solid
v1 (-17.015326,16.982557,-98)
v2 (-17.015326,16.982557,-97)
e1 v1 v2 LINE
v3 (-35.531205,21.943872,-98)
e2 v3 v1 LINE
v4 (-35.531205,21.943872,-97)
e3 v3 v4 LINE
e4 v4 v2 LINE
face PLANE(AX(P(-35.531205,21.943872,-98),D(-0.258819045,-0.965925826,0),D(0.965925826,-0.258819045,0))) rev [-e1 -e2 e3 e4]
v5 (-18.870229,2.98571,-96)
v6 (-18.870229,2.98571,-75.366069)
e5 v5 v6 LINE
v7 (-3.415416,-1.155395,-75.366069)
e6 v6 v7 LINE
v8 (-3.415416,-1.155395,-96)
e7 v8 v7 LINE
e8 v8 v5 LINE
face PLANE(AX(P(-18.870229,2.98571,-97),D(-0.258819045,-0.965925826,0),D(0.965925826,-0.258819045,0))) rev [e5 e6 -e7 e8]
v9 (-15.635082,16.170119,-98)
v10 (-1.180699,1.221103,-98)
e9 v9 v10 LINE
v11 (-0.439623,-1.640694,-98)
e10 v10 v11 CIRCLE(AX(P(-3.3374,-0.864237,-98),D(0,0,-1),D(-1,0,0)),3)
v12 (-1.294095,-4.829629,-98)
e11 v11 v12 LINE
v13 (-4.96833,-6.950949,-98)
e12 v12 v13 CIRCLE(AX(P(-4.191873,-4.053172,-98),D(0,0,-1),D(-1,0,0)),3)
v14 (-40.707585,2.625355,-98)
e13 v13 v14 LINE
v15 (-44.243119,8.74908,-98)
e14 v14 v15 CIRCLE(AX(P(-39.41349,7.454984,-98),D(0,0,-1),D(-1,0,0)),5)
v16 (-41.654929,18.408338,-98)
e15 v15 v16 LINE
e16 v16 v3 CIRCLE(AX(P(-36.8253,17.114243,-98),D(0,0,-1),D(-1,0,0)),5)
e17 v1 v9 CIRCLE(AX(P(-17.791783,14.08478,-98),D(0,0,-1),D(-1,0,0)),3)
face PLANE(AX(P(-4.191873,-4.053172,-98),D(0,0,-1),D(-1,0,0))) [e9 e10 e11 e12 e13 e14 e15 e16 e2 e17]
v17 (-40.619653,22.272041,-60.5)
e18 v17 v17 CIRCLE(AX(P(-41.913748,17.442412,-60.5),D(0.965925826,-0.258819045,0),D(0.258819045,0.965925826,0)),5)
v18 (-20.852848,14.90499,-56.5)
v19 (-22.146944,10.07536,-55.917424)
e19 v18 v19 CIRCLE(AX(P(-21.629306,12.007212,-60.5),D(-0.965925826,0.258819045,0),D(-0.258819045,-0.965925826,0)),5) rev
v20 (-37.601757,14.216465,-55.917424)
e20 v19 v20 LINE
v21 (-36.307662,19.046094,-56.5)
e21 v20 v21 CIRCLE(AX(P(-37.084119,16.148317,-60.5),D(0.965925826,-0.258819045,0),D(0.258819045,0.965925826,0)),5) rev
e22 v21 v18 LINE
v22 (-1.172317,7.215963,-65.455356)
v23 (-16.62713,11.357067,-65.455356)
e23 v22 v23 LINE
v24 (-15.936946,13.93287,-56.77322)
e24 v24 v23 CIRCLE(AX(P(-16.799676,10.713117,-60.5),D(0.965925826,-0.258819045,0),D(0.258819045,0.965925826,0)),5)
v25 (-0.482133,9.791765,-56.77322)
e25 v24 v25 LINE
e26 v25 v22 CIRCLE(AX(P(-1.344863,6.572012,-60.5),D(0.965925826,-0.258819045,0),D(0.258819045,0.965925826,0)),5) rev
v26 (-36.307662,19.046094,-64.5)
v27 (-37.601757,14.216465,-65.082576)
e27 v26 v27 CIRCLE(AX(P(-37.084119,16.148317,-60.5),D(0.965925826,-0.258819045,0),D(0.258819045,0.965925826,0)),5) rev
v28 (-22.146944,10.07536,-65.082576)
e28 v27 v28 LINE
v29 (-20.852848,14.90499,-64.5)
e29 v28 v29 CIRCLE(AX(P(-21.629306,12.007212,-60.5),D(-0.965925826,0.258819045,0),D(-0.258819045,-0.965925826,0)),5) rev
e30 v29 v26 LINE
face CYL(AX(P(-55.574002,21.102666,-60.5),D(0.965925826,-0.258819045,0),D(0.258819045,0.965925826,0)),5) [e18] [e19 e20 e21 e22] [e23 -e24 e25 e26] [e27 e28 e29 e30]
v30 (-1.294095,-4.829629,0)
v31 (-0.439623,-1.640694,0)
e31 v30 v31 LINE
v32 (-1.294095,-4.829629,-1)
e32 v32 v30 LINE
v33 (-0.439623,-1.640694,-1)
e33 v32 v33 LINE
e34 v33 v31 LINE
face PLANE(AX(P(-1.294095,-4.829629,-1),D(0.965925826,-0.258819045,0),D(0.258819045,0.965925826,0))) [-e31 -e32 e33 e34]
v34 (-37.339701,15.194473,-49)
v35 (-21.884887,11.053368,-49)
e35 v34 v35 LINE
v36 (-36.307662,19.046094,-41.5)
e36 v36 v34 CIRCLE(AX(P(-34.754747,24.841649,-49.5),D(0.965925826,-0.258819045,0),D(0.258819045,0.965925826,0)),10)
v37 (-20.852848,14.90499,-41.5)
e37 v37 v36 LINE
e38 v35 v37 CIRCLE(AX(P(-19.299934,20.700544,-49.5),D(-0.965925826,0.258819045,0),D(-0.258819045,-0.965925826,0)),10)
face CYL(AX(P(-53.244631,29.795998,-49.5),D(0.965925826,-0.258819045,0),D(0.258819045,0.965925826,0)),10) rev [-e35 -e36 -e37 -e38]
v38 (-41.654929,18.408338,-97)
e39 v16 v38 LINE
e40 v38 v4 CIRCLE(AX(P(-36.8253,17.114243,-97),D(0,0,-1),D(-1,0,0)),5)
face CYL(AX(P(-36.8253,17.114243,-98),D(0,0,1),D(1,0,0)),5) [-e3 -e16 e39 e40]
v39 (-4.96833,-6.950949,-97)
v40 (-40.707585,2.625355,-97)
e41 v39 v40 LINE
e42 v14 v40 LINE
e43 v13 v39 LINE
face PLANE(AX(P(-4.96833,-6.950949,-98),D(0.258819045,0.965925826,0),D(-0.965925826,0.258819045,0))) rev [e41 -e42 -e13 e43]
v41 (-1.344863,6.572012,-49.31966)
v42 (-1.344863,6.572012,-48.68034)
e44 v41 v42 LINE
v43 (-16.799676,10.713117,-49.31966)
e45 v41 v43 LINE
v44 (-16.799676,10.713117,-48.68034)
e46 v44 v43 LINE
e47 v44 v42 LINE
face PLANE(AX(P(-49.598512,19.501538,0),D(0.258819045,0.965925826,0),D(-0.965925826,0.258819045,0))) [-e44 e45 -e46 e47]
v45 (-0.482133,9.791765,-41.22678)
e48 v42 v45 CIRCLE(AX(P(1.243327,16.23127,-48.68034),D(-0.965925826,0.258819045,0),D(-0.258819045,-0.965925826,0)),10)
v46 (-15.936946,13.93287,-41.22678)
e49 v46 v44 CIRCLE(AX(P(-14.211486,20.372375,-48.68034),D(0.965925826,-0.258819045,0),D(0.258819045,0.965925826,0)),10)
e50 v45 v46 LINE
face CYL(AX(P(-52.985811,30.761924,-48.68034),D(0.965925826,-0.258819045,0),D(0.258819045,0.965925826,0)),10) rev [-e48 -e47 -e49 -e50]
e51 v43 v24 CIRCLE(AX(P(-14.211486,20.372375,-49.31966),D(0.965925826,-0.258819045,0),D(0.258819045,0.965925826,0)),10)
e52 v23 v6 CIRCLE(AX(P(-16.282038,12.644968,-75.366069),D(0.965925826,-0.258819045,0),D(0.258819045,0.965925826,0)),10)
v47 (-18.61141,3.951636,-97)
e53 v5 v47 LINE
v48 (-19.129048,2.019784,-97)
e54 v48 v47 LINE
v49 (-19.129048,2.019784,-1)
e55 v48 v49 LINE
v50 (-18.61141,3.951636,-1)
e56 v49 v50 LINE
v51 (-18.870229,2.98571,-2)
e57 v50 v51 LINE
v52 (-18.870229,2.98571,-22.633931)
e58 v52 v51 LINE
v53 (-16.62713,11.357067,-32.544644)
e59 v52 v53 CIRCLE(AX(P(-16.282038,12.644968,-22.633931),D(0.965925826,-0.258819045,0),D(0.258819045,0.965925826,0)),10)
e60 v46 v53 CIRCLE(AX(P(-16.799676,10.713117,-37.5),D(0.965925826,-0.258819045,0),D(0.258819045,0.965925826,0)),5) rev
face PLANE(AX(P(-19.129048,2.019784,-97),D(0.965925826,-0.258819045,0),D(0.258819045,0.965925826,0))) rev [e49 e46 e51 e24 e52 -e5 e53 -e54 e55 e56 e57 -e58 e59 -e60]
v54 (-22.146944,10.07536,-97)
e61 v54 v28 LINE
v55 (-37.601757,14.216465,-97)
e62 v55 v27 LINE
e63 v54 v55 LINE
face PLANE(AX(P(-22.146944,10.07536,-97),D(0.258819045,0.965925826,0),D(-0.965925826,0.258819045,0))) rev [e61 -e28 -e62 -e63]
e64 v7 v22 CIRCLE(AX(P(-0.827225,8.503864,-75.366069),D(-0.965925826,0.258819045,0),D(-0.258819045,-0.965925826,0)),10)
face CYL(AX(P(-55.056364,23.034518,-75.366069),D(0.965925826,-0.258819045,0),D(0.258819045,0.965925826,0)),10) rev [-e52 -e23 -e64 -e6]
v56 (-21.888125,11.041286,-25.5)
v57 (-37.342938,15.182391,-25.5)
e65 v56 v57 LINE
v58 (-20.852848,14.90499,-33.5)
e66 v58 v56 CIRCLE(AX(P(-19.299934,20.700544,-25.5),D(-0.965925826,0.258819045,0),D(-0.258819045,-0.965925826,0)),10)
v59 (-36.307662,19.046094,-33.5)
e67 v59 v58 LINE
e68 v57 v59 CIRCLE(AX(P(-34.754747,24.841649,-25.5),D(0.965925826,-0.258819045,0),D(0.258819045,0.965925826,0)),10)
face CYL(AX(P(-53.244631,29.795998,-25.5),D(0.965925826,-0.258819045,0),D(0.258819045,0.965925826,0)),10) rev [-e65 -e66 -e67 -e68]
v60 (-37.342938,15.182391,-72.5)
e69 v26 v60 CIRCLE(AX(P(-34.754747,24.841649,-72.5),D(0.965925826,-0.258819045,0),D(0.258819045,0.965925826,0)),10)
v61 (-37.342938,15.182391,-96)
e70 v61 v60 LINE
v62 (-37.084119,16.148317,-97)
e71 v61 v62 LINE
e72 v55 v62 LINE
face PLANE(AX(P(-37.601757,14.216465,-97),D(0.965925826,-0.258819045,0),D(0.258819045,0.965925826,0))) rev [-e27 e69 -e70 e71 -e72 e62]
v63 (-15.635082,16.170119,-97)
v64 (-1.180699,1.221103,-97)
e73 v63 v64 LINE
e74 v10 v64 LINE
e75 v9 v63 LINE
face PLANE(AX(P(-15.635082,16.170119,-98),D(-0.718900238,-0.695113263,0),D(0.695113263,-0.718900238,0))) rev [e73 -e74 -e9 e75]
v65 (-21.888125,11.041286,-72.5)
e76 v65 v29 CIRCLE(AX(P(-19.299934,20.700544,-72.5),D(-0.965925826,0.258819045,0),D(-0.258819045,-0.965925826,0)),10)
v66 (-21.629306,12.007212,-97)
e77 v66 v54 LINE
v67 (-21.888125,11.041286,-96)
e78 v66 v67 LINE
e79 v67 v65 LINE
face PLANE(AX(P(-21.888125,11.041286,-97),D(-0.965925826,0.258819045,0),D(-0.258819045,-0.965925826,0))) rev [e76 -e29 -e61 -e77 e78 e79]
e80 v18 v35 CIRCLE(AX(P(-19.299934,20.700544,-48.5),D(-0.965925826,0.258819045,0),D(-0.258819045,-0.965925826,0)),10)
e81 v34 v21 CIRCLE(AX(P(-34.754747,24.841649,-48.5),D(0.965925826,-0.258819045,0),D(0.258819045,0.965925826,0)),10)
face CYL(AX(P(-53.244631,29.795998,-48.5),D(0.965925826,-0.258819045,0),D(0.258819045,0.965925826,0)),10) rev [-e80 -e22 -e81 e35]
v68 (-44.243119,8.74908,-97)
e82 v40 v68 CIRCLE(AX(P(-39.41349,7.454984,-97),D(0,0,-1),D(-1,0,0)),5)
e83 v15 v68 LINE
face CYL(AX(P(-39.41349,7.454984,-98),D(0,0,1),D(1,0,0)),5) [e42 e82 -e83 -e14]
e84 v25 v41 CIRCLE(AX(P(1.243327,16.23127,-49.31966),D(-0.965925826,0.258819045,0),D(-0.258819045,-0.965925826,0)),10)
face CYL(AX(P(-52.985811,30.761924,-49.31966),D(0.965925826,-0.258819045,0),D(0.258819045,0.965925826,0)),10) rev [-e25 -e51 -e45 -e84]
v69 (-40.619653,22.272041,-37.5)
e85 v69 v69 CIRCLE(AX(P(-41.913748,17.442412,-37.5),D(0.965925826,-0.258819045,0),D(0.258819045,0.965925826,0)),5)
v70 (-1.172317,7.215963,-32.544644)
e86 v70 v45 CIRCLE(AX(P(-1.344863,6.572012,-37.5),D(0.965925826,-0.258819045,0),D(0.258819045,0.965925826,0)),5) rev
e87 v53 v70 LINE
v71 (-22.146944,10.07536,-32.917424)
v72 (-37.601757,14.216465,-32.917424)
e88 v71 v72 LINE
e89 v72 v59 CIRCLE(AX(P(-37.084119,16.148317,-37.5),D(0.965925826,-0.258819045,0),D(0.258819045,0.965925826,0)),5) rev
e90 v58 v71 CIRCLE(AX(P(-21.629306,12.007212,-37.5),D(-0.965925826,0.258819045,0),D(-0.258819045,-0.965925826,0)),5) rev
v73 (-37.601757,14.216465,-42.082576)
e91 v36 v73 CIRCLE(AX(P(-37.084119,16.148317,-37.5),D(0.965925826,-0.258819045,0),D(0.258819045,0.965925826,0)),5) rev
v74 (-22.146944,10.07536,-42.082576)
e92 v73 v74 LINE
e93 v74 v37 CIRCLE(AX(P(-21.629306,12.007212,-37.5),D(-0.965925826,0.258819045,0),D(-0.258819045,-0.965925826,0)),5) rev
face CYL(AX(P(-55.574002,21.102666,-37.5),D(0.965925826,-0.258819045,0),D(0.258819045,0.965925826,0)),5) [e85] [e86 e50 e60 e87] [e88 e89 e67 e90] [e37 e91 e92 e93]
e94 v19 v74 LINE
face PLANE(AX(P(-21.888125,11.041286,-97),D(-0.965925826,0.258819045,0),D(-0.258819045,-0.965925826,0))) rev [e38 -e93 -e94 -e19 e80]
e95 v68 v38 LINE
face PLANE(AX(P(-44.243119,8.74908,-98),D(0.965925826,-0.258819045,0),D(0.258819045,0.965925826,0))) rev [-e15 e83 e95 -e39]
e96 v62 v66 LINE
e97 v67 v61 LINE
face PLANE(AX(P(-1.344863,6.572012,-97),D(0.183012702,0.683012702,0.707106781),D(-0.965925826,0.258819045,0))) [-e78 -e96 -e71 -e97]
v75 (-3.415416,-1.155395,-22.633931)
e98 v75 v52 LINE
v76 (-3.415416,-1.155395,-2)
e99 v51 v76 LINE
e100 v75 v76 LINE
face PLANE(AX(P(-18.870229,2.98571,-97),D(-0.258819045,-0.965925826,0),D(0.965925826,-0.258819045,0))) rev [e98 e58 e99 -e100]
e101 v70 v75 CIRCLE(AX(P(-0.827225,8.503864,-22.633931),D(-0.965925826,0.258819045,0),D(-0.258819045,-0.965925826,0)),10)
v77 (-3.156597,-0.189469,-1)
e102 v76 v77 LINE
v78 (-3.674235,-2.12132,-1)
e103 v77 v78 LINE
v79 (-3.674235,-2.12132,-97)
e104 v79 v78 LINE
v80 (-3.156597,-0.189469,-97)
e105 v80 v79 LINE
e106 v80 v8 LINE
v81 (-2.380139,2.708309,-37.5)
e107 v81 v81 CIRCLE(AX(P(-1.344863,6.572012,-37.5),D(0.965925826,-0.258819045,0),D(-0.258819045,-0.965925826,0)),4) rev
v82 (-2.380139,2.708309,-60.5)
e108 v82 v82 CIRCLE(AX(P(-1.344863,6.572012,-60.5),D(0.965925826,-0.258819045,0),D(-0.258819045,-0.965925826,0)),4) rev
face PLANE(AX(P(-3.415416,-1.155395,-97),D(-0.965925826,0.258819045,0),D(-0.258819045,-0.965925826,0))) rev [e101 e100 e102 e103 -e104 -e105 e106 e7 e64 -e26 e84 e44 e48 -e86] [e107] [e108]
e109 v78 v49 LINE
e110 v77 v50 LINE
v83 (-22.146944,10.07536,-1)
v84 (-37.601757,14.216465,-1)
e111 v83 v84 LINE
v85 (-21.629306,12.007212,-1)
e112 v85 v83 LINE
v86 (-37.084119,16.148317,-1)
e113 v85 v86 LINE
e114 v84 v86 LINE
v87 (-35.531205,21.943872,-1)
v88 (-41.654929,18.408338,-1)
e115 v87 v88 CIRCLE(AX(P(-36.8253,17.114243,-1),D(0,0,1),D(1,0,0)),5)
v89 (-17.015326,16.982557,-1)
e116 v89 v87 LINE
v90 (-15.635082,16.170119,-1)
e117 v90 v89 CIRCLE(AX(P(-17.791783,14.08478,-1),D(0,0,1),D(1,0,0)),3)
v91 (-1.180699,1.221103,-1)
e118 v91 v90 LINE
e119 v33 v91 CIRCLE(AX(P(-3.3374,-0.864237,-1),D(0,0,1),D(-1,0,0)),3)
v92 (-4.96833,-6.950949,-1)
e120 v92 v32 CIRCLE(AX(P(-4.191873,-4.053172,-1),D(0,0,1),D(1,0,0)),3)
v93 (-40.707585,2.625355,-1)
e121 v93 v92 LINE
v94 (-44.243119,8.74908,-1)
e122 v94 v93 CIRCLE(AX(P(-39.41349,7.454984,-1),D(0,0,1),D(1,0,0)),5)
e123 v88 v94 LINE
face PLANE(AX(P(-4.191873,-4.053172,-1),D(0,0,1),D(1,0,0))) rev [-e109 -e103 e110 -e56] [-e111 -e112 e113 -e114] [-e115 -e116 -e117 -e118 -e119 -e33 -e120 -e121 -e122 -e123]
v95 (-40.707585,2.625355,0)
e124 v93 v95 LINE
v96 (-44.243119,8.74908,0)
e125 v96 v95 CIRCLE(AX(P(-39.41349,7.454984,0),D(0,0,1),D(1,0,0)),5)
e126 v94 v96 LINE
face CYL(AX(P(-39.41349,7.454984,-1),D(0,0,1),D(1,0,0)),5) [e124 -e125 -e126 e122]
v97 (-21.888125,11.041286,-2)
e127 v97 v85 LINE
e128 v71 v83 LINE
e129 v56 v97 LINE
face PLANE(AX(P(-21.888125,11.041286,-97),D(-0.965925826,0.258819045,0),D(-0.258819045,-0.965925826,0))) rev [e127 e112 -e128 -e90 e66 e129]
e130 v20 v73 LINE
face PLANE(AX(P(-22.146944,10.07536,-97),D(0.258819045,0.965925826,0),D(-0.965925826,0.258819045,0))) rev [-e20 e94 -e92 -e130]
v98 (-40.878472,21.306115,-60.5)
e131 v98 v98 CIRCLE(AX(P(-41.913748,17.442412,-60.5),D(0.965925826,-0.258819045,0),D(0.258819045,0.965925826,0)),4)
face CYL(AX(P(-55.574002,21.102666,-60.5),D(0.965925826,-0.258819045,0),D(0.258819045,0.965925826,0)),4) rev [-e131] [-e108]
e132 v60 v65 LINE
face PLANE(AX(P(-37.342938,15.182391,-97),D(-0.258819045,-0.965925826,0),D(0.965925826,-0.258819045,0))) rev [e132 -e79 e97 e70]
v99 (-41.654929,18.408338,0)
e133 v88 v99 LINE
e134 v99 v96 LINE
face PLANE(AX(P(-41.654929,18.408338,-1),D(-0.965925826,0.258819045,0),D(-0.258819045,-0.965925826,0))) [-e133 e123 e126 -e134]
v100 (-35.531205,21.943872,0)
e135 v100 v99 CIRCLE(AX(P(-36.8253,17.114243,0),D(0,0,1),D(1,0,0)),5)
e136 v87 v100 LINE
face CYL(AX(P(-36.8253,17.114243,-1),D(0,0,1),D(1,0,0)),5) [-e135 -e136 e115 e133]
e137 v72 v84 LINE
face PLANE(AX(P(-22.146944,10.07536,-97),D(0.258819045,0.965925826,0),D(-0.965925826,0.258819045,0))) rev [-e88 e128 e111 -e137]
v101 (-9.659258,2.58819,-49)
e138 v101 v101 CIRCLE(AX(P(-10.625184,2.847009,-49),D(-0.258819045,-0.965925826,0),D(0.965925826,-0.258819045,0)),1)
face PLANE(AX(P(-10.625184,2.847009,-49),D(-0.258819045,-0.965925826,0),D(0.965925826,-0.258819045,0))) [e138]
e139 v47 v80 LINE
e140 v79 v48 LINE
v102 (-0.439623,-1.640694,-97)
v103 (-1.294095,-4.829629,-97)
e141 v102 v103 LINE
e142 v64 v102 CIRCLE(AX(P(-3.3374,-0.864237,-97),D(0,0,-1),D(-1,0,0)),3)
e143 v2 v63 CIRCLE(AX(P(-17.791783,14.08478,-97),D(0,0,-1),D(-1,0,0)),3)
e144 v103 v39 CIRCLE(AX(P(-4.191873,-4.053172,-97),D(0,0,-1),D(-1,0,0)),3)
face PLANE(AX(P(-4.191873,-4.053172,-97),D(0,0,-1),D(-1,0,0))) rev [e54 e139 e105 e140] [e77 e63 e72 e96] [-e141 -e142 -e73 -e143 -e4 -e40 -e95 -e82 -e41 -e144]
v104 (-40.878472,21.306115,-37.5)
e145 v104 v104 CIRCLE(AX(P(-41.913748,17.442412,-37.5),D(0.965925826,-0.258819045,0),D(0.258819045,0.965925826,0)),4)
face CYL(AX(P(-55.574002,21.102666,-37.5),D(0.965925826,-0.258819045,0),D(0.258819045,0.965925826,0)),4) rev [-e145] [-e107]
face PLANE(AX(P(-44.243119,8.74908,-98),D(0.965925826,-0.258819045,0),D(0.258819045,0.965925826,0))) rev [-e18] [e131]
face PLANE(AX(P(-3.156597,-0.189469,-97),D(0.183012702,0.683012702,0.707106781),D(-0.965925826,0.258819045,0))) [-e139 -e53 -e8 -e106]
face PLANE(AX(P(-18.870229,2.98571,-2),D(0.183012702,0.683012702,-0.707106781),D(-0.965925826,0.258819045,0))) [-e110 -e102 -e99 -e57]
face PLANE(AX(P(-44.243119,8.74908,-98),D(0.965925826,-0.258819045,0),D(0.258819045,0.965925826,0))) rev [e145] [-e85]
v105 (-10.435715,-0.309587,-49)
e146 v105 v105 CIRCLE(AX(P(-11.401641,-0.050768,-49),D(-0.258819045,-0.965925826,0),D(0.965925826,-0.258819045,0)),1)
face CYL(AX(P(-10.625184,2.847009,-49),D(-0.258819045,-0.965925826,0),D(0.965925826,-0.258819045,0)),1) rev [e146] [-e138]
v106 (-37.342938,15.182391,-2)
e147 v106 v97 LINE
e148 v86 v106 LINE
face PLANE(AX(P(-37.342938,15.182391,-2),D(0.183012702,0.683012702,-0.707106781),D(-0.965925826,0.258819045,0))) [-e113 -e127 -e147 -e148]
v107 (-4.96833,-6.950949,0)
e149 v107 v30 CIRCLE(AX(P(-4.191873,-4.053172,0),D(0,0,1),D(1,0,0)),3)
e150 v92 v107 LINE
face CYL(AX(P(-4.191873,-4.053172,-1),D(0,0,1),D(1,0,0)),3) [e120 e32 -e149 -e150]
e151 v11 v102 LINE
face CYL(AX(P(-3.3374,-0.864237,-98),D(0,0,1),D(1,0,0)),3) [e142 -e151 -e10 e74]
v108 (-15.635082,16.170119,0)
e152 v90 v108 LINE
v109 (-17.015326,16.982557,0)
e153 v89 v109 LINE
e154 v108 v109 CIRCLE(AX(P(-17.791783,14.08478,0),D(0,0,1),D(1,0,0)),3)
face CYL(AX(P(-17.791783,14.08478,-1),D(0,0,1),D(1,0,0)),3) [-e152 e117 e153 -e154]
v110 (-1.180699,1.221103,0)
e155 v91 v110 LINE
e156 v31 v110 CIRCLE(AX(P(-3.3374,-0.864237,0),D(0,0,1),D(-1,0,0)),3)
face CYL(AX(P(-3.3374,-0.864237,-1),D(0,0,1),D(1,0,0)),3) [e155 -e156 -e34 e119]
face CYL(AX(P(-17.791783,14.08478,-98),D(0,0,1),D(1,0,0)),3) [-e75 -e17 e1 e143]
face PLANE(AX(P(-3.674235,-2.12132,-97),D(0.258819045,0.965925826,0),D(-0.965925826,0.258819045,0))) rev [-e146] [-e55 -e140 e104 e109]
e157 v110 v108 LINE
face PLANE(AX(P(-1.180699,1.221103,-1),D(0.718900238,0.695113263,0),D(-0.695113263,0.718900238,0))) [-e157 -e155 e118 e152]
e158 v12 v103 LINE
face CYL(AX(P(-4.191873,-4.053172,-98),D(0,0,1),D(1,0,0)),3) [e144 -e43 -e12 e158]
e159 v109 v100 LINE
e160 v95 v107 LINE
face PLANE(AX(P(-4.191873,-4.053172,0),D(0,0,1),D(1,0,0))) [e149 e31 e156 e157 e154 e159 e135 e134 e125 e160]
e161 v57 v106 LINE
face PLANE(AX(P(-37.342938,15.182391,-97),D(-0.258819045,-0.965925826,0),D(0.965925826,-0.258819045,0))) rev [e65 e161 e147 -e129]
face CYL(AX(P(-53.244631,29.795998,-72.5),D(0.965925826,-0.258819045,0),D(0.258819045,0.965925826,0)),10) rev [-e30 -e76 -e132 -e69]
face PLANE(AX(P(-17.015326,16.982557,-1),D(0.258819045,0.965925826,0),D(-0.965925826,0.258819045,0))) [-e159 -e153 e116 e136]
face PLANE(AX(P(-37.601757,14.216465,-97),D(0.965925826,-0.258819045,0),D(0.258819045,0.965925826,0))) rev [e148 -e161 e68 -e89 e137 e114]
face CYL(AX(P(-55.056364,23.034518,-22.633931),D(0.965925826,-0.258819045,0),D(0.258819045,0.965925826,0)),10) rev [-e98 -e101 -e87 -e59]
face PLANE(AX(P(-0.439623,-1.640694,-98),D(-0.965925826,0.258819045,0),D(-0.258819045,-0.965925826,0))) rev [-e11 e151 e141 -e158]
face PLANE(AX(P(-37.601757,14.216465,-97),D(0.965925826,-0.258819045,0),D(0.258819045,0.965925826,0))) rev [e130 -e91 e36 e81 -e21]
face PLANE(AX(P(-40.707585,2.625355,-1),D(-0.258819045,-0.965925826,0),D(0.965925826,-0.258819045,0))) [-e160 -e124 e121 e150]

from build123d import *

# Parameters (mm, degrees)
BOSS_EXTRUDE1_DEPTH = 1
BOSS_EXTRUDE2_DEPTH = 96
BOSS_EXTRUDE3_DEPTH = 1
BOSS_EXTRUDE4_DEPTH = 16
EXTRUDE_THIN1_REACH = 110.549
CUT_EXTRUDE1_DEPTH  = 102.965680501
CUT_EXTRUDE2_DEPTH  = 102.965680501
FILLET1_START       = -19
FILLET1_DEPTH       = 16
FILLET2_R           = 10
FILLET3_R           = 10
FILLET4_R           = 10
CHAMFER1_SIZE       = 1
CHAMFER2_SIZE       = 1
SKETCH8_R           = 1
CUT_EXTRUDE3_DEPTH  = 3


with BuildPart() as part:
    # Sketch1 → Boss-Extrude1 (new body)
    with BuildSketch(Plane.XY):
        with BuildLine():
            Line((-1.180699325, 1.221103194), (-15.635082302, 16.170119303))
            ThreePointArc((-15.635082302, 16.170119303), (-16.269985561, 16.670148445), (-17.01532588, 16.982556993))
            Line((-17.01532588, 16.982556993), (-35.53120451, 21.94387172))
            ThreePointArc((-35.53120451, 21.94387172), (-39.325299736, 21.444369607), (-41.654928867, 18.408337814))
            Line((-41.654928867, 18.408337814), (-44.243119318, 8.749079551))
            ThreePointArc((-44.243119318, 8.749079551), (-43.743617206, 4.954984325), (-40.707585412, 2.625355194))
            Line((-40.707585412, 2.625355194), (-4.96832984, -6.950949475))
            ThreePointArc((-4.96832984, -6.950949475), (-2.691872704, -6.651248207), (-1.294095226, -4.829629131))
            Line((-1.294095226, -4.829629131), (-0.43962256, -1.640693729))
            ThreePointArc((-0.43962256, -1.640693729), (-0.433194836, -0.11217799), (-1.180699325, 1.221103194))
        make_face()
    extrude(amount=-BOSS_EXTRUDE1_DEPTH)

    # Sketch2 → Boss-Extrude2 (add)
    with BuildSketch(Plane(origin=(0, 0, -1), x_dir=(-1, 0, 0), z_dir=(0, 0, -1))):
        Polygon((3.415415569, -1.155394517), (3.674234614, -2.121320344), (19.129047835, 2.019784378), (18.87022879, 2.985710204), align=None)
        Polygon((21.888124605, 11.041286214), (22.146943651, 10.075360388), (37.601756871, 14.216465109), (37.342937826, 15.182390936), align=None)
    extrude(amount=BOSS_EXTRUDE2_DEPTH)

    # Sketch3 → Boss-Extrude3 (add)
    with BuildSketch(Plane(origin=(0, 0, -97), x_dir=(-1, 0, 0), z_dir=(0, 0, -1))):
        with BuildLine():
            Line((4.96832984, -6.950949475), (40.707585412, 2.625355194))
            ThreePointArc((40.707585412, 2.625355194), (43.743617206, 4.954984325), (44.243119318, 8.749079551))
            Line((44.243119318, 8.749079551), (41.654928867, 18.408337814))
            ThreePointArc((41.654928867, 18.408337814), (39.325299736, 21.444369607), (35.53120451, 21.94387172))
            Line((35.53120451, 21.94387172), (17.01532588, 16.982556993))
            ThreePointArc((17.01532588, 16.982556993), (16.269985561, 16.670148445), (15.635082302, 16.170119303))
            Line((15.635082302, 16.170119303), (1.180699325, 1.221103194))
            ThreePointArc((1.180699325, 1.221103194), (0.433194836, -0.11217799), (0.43962256, -1.640693729))
            Line((0.43962256, -1.640693729), (1.294095226, -4.829629131))
            ThreePointArc((1.294095226, -4.829629131), (2.691872704, -6.651248207), (4.96832984, -6.950949475))
        make_face()
    extrude(amount=BOSS_EXTRUDE3_DEPTH)

    # Sketch4 → Boss-Extrude4 (add)
    with BuildSketch(Plane(origin=(-2.897777479, 0.776457135, 0), x_dir=(0, 0, -1), z_dir=(0.9659258262890703, -0.25881904510251386, 0))):
        with BuildLine():
            Line((49, 6), (49, -2))
            Line((49, -2), (65.5, -2))
            Line((65.5, -2), (65.5, 6))
            ThreePointArc((65.5, 6), (60.5, 1), (55.5, 6))
            Line((55.5, 6), (49, 6))
        make_face()
        with BuildLine():
            Line((32.5, 6), (32.5, -2))
            Line((32.5, -2), (49, -2))
            Line((49, -2), (49, 6))
            Line((49, 6), (42.5, 6))
            ThreePointArc((42.5, 6), (37.5, 1), (32.5, 6))
        make_face()
    extrude(amount=-BOSS_EXTRUDE4_DEPTH)

    # Extrude-Thin1: up to this face of the body (flat: up to its plane)
    extrude_thin1_end = Plane(part.part.faces().sort_by_distance((-42.949024093, 13.578708682, -97.5))[0])
    # Sketch5 → Extrude-Thin1 (add, up to the picked face)
    with BuildSketch(Plane(origin=(-2.897777479, 0.776457135, 0), x_dir=(0, 0, -1), z_dir=(0.9659258262890703, -0.25881904510251386, 0)), mode=Mode.PRIVATE) as extrude_thin1_sk1:
        with BuildLine():
            ThreePointArc((55.5, 6), (60.5, 1), (65.5, 6))
            ThreePointArc((65.5, 6), (60.5, 11), (55.5, 6))
        make_face()
        with BuildLine():
            ThreePointArc((56.5, 6), (60.5, 2), (64.5, 6))
            ThreePointArc((64.5, 6), (60.5, 10), (56.5, 6))
        make_face(mode=Mode.SUBTRACT)
    extrude_thin1_tool1 = split(extrude(extrude_thin1_sk1.sketch, amount=-EXTRUDE_THIN1_REACH, mode=Mode.PRIVATE), bisect_by=extrude_thin1_end, keep=Keep.BOTH, mode=Mode.PRIVATE)
    # Sketch5 → Extrude-Thin1 (add, up to the picked face)
    with BuildSketch(Plane(origin=(-2.897777479, 0.776457135, 0), x_dir=(0, 0, -1), z_dir=(0.9659258262890703, -0.25881904510251386, 0)), mode=Mode.PRIVATE) as extrude_thin1_sk2:
        with BuildLine():
            ThreePointArc((32.5, 6), (37.5, 1), (42.5, 6))
            ThreePointArc((42.5, 6), (37.5, 11), (32.5, 6))
        make_face()
        with BuildLine():
            ThreePointArc((33.5, 6), (37.5, 2), (41.5, 6))
            ThreePointArc((41.5, 6), (37.5, 10), (33.5, 6))
        make_face(mode=Mode.SUBTRACT)
    extrude_thin1_tool2 = split(extrude(extrude_thin1_sk2.sketch, amount=-EXTRUDE_THIN1_REACH, mode=Mode.PRIVATE), bisect_by=extrude_thin1_end, keep=Keep.BOTH, mode=Mode.PRIVATE)
    add(extrude_thin1_tool1.solids().sort_by(Axis((-2.602356, 1.878986, -60.5), (-0.9659258262890703, 0.25881904510251386, 0)))[0])
    add(extrude_thin1_tool2.solids().sort_by(Axis((-2.602356, 1.878986, -37.5), (-0.9659258262890703, 0.25881904510251386, 0)))[0])

    # Sketch6 → Cut-Extrude1 (cut, through all)
    with BuildSketch(Plane(origin=(-23.182219831, 6.211657082, 0), x_dir=(0, 0, -1), z_dir=(0.9659258262890705, -0.2588190451025127, 0))):
        with BuildLine():
            Line((57.035898385, 4), (63.964101615, 4))
            ThreePointArc((63.964101615, 4), (64.202459174, 4.486132084), (64.372983346, 5))
            Line((64.372983346, 5), (56.627016654, 5))
            ThreePointArc((56.627016654, 5), (56.797540826, 4.486132084), (57.035898385, 4))
        make_face()
    extrude(amount=-CUT_EXTRUDE1_DEPTH, mode=Mode.SUBTRACT)

    # Sketch7 → Cut-Extrude2 (cut, through all)
    with BuildSketch(Plane(origin=(-23.182219831, 6.211657082, 0), x_dir=(0, 0, -1), z_dir=(0.9659258262890704, -0.25881904510251263, 0))):
        with BuildLine():
            Line((34.035898385, 4), (40.964101615, 4))
            ThreePointArc((40.964101615, 4), (41.202459174, 4.486132084), (41.372983346, 5))
            Line((41.372983346, 5), (33.627016654, 5))
            ThreePointArc((33.627016654, 5), (33.797540826, 4.486132084), (34.035898385, 4))
        make_face()
    extrude(amount=-CUT_EXTRUDE2_DEPTH, mode=Mode.SUBTRACT)

    # Fillet1: read off the stored shape, not the designer's step
    # Fillet1 outline → Fillet1 (add)
    with BuildSketch(Plane(origin=(0, 0, 0), x_dir=(0.2588190451025141, 0.96592582628907, 0), z_dir=(0.9659258262890701, -0.2588190451025141, 0)).offset(FILLET1_START)):
        with BuildLine():
            ThreePointArc((6.666666667, -32.544643751), (0.472273473, -29.216737139), (-2, -22.633931253))
            Line((-2, -22.633931253), (-2, -32.5))
            Line((-2, -32.5), (6, -32.5))
            ThreePointArc((6, -32.5), (6.334079897, -32.511173422), (6.666666667, -32.544643751))
        make_face()
        with BuildLine():
            ThreePointArc((-2, -75.366068747), (0.472273473, -68.783262861), (6.666666667, -65.455356249))
            ThreePointArc((6.666666667, -65.455356249), (6.334079897, -65.488826578), (6, -65.5))
            Line((6, -65.5), (-2, -65.5))
            Line((-2, -65.5), (-2, -75.366068747))
        make_face()
    extrude(amount=FILLET1_DEPTH)

    # Fillet2
    # the kernel refuses this fillet: 10 mm, written as the material it adds along each edge
    with BuildSketch(Plane(origin=(-37.342937826, 15.182390936, -65.398979486), x_dir=(0, 0, -1), z_dir=(0.9659258262890703, -0.25881904510251386, 0))) as fillet2_piece_1:
        with BuildLine():
            CenterArc((7.101020514, 10), FILLET2_R, 216.869897646, 53.130102354)
            ThreePointArc((-0.898979486, 4), (-0.020664308, 2.096376317), (0, 0))
            Line((0, 0), (7.101020514, 0))
        make_face()
    extrude(amount=16)
    with BuildSketch(Plane(origin=(-37.342937826, 15.182390936, -32.601020514), x_dir=(0.25252017519049164, 0.9424181237471358, -0.21927526343546186), z_dir=(0.9659258262890703, -0.25881904510251386, 0))) as fillet2_piece_2:
        with BuildLine():
            CenterArc((8.199552211, 9.120955865), FILLET2_R, 192.666469307, 53.130102354)
            Line((-1.557078144, 6.92820323), (0, 0))
            ThreePointArc((0, 0), (2.049888053, 0.439522068), (4.099776106, 0))
        make_face()
    extrude(amount=16)

    # Fillet3
    # the kernel refuses this fillet: 10 mm, written as the material it adds along each edge
    with BuildSketch(Plane(origin=(-37.342937826, 15.182390936, -55.601020514), x_dir=(0.252520175190492, 0.9424181237471373, -0.21927526343545575), z_dir=(0.9659258262890703, -0.25881904510251386, 0))) as fillet3_piece_1:
        with BuildLine():
            CenterArc((8.199552211, 9.120955865), FILLET3_R, 192.666469307, 53.130102354)
            Line((-1.557078144, 6.92820323), (0, 0))
            ThreePointArc((0, 0), (2.049888053, 0.439522068), (4.099776106, 0))
        make_face()
    extrude(amount=16)
    with BuildSketch(Plane(origin=(-37.342937826, 15.182390936, -42.398979486), x_dir=(0, 0, -1), z_dir=(0.9659258262890703, -0.25881904510251386, 0))) as fillet3_piece_2:
        with BuildLine():
            CenterArc((7.101020514, 10), FILLET3_R, 216.869897646, 53.130102354)
            ThreePointArc((-0.898979486, 4), (-0.020664308, 2.096376317), (0, 0))
            Line((0, 0), (7.101020514, 0))
        make_face()
    extrude(amount=16)

    # Fillet4
    # the kernel refuses this fillet: 10 mm, written as the material it adds along each edge
    with BuildSketch(Plane(origin=(-1.344863208, 6.572012093, -42.5), x_dir=(0.24178159790789314, 0.9023412077274722, 0.35682208977308716), z_dir=(-0.9659258262890703, 0.25881904510251386, 0))) as fillet4_piece_1:
        with BuildLine():
            CenterArc((7.136441795, 9.34172359), FILLET4_R, 200.905157448, 48.189685104)
            Line((-2.205281794, 5.773502692), (-2.392116266, 5.702138274))
            Line((-2.392116266, 5.702138274), (-0.186834472, -0.071364418))
            Line((-0.186834472, -0.071364418), (0.071364418, -0.186834472))
            ThreePointArc((0.071364418, -0.186834472), (1.784110449, 0.129138205), (3.49685648, -0.186834472))
            Line((3.49685648, -0.186834472), (3.568220898, 0))
        make_face()
    extrude(amount=16)
    with BuildSketch(Plane(origin=(-1.344863208, 6.572012093, -55.5), x_dir=(0.24178159790789344, 0.9023412077274733, -0.3568220897730836), z_dir=(-0.9659258262890703, 0.25881904510251386, 0))) as fillet4_piece_2:
        with BuildLine():
            CenterArc((7.136441795, -9.34172359), FILLET4_R, 110.905157448, 48.189685104)
            Line((-2.205281794, -5.773502692), (-2.392116266, -5.702138274))
            Line((-2.392116266, -5.702138274), (-0.186834472, 0.071364418))
            Line((-0.186834472, 0.071364418), (0.071364418, 0.186834472))
            ThreePointArc((0.071364418, 0.186834472), (1.784110449, -0.129138205), (3.49685648, 0.186834472))
            Line((3.49685648, 0.186834472), (3.568220898, 0))
        make_face()
    extrude(amount=16)

    # Chamfer1
    chamfer1_edges = [part.edges().sort_by_distance(p)[0] for p in [
        (-11.142822179, 0.915157844, -1),
        (-11.142822179, 0.915157844, -97),
    ]]
    chamfer(chamfer1_edges, length=CHAMFER1_SIZE)

    # Chamfer2
    chamfer2_edges = [part.edges().sort_by_distance(p)[0] for p in [
        (-29.615531216, 13.111838575, -1),
        (-29.615531216, 13.111838575, -97),
    ]]
    chamfer(chamfer2_edges, length=CHAMFER2_SIZE)

    # Sketch8 → Cut-Extrude3 (cut)
    with BuildSketch(Plane(origin=(-0.776457135, -2.897777479, 0), x_dir=(0.9659258262890701, -0.25881904510251413, 0), z_dir=(-0.25881904510251413, -0.9659258262890701, 0))):
        with Locations((-11, -49)):
            Circle(SKETCH8_R)
    extrude(amount=-CUT_EXTRUDE3_DEPTH, mode=Mode.SUBTRACT)


solid = part.part
